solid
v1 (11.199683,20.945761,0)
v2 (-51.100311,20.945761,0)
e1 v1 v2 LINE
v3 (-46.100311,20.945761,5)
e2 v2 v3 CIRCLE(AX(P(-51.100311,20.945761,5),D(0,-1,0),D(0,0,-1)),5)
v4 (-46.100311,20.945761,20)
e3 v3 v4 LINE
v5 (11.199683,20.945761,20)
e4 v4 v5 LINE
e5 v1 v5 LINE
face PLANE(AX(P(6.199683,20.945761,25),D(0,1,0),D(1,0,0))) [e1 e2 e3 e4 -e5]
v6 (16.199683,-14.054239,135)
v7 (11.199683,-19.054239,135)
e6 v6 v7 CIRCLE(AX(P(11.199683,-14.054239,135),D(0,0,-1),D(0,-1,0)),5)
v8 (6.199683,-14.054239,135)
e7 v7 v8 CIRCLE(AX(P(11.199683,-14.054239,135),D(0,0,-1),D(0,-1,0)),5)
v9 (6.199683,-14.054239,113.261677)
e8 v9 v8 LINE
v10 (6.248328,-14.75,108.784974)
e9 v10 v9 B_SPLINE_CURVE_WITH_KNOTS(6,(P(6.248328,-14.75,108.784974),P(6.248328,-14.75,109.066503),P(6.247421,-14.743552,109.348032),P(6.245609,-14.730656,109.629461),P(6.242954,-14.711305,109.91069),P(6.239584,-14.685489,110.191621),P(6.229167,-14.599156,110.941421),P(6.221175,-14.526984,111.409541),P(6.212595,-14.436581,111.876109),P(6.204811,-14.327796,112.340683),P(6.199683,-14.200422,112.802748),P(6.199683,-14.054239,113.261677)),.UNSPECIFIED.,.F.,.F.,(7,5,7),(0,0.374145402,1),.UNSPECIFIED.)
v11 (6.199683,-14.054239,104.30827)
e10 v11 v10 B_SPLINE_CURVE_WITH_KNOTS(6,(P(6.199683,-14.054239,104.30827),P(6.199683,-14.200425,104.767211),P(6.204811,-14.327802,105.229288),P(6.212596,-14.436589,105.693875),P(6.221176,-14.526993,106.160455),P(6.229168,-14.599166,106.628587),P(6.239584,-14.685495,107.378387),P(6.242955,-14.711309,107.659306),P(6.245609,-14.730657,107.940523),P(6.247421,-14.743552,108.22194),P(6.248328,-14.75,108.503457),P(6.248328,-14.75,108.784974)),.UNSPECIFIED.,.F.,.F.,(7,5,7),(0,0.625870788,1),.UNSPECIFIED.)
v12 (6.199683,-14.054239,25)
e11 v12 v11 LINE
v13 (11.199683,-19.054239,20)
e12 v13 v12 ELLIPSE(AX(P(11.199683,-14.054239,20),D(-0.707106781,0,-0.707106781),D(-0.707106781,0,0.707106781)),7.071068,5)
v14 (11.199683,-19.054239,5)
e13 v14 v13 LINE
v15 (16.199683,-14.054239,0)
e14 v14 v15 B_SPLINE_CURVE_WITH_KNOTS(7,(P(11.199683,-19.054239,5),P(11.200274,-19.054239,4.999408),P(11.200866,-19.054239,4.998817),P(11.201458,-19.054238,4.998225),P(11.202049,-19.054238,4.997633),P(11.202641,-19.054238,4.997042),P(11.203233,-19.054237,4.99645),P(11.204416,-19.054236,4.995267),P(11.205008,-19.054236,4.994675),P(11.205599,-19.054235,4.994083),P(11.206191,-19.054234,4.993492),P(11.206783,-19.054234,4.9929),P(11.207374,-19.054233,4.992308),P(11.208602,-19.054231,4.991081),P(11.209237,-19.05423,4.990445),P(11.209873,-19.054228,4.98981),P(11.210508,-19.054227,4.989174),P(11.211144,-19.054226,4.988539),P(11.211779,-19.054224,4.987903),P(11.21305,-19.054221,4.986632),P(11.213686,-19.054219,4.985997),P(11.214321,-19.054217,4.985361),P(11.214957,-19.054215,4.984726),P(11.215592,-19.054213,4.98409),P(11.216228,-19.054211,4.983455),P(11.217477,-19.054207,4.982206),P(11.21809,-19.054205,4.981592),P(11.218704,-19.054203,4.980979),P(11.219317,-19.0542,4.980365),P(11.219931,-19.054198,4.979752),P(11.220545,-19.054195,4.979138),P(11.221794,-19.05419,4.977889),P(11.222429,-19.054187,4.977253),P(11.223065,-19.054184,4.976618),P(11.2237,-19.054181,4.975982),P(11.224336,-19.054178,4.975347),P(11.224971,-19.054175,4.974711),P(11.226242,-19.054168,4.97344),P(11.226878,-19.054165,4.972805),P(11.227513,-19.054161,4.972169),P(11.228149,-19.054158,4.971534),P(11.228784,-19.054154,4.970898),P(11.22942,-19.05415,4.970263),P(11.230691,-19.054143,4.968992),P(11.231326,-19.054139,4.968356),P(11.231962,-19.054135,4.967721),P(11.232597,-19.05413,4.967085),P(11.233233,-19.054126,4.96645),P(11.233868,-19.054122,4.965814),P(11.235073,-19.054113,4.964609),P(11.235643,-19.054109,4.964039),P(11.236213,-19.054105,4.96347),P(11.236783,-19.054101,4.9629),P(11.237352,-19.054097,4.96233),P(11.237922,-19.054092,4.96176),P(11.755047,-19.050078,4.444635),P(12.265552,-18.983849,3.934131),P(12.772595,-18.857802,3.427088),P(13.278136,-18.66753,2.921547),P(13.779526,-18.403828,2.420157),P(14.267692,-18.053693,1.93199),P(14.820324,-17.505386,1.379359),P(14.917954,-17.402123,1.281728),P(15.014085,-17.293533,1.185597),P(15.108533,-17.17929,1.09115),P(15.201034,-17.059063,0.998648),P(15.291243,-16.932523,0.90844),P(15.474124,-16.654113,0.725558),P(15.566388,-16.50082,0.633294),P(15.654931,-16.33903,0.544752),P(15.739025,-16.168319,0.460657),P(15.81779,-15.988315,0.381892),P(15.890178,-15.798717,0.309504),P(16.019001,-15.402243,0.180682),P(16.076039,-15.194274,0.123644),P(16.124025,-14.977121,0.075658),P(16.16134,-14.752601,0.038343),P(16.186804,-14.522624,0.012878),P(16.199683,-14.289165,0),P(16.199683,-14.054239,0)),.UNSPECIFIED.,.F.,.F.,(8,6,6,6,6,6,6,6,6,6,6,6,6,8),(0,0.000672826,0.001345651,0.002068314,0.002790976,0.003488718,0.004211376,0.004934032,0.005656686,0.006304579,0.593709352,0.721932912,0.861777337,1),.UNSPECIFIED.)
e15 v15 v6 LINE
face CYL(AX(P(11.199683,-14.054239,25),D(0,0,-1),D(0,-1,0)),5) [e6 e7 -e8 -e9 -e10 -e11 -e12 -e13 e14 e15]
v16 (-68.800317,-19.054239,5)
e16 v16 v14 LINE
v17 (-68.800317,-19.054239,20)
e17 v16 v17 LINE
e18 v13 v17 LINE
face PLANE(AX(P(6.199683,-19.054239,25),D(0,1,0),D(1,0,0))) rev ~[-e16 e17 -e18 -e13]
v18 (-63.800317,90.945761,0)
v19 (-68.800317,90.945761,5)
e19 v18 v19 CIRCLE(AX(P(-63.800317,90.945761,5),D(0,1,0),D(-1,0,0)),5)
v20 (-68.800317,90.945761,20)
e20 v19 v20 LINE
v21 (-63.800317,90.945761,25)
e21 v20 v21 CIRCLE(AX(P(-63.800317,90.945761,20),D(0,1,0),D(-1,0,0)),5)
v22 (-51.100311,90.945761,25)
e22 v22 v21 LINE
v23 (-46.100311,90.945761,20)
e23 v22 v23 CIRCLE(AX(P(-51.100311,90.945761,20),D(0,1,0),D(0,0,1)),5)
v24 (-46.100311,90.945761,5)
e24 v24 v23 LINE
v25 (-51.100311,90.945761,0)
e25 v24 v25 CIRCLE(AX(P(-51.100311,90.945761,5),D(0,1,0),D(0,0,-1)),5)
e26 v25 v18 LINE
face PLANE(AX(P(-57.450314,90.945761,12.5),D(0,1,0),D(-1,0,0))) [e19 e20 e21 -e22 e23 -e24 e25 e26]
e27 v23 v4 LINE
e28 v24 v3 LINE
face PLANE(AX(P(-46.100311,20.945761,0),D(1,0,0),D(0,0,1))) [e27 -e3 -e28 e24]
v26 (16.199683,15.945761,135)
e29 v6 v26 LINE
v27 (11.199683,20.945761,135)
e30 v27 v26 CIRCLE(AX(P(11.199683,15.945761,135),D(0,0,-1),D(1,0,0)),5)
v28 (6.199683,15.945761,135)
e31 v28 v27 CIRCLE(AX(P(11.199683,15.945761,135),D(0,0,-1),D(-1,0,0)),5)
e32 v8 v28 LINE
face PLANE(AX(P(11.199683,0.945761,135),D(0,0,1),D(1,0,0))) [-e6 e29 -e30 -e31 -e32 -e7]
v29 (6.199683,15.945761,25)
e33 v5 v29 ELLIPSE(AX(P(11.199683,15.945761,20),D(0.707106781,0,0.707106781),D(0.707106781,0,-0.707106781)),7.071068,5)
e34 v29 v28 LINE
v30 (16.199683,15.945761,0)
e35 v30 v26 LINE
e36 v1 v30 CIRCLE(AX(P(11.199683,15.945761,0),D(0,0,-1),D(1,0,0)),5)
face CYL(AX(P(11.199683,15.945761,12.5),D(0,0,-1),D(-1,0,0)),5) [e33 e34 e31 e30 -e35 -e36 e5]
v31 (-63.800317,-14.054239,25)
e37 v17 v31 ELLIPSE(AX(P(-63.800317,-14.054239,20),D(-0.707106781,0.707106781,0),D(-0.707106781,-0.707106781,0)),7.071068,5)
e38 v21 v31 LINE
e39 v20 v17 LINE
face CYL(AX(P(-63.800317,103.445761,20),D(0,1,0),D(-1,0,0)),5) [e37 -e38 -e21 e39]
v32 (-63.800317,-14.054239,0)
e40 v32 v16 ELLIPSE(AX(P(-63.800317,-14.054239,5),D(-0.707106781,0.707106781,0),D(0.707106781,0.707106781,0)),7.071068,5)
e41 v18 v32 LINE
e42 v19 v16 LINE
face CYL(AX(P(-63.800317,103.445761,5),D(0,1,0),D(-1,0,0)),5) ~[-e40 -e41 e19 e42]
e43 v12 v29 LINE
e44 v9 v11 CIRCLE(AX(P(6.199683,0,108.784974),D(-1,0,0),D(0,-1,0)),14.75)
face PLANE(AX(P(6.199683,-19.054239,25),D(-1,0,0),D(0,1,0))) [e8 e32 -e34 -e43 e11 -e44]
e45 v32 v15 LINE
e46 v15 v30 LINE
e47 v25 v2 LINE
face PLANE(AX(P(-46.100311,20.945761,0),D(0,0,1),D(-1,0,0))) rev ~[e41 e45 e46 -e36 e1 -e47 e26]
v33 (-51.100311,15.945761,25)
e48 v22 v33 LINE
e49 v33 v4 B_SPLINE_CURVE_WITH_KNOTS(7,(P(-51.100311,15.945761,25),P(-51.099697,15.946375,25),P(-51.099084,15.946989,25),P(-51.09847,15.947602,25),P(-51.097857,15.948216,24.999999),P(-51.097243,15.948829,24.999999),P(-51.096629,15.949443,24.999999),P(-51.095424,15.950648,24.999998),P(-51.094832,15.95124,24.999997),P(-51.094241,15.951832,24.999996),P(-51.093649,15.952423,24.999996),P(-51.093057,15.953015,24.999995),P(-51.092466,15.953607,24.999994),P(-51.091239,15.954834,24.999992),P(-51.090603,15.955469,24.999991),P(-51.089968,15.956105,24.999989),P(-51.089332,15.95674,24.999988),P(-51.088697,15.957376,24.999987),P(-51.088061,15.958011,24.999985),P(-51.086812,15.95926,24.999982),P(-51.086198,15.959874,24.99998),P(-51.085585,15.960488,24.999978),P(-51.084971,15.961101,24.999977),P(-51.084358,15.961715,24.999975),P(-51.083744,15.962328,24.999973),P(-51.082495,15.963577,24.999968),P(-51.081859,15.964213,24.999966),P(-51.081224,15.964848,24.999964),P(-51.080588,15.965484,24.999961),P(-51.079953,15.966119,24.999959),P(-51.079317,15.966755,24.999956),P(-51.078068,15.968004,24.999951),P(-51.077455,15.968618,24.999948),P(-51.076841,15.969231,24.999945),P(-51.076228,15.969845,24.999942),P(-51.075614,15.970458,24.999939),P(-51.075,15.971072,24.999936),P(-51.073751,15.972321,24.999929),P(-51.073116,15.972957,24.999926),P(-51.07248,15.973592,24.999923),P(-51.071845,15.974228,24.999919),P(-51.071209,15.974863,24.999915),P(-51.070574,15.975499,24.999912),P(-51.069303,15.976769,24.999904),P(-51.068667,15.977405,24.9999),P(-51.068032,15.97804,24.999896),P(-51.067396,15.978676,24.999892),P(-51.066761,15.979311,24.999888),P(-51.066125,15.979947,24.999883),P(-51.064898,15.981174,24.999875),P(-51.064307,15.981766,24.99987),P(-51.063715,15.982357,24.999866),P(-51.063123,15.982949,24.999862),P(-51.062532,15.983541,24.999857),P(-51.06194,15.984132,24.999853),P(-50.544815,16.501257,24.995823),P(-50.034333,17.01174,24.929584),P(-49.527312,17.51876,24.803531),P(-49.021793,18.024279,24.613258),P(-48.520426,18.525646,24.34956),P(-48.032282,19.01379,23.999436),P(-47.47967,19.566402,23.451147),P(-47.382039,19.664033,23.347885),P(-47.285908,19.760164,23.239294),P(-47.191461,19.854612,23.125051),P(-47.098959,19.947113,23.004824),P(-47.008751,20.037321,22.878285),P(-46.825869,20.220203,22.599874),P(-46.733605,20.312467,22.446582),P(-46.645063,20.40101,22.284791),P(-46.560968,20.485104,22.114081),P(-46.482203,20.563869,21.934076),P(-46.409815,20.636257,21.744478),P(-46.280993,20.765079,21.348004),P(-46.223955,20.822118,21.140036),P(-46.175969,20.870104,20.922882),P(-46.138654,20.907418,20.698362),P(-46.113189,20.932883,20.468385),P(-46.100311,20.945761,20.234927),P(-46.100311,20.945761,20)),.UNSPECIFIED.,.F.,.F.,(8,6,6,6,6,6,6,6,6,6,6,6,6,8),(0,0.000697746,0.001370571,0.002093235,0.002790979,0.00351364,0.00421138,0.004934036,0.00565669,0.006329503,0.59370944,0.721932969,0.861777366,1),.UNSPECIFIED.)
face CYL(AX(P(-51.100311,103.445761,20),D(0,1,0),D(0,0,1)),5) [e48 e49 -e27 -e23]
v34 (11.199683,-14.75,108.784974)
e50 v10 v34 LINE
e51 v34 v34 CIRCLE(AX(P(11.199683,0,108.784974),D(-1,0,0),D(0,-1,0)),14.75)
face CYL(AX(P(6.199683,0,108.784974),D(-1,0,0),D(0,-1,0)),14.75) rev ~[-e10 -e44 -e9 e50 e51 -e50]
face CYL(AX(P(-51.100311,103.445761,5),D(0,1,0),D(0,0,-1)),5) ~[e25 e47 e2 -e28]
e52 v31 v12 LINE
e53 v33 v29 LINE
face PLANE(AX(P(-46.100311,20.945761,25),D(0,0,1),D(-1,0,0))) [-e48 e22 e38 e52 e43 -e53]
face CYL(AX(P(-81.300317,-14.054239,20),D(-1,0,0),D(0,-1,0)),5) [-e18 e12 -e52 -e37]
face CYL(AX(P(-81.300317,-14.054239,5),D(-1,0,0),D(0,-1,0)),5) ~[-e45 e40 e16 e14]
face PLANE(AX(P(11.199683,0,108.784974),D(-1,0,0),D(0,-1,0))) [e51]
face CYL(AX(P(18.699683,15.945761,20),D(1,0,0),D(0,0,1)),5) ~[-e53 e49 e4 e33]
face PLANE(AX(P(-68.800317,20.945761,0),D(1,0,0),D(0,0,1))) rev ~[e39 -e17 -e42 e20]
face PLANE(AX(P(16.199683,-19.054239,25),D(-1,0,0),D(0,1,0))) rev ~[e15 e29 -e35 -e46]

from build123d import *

# Parameters (mm, degrees)
F0_W         = 70
F0_H         = 40
F0_W_2       = 15
F1_DEPTH     = 25
F2_W         = 10
F2_H         = 40
F3_DEPTH     = 110
F4_W         = 22.7000065148
F4_H         = 25
F5_DEPTH     = 70
F6_R         = 14.75
F7_DEPTH     = 5
F8_T1_DEPTH  = 87.5
F8_T3_DEPTH  = 52.2999934852
F8_T5_DEPTH  = 82.5
F8_T7_DEPTH  = 135
F8_T9_DEPTH  = 110
F8_T11_DEPTH = 160
F8_T13_DEPTH = 122.5
F8_T19_DEPTH = 100
F8_T23_DEPTH = 135
F8_T30_DEPTH = 64.7999934852
F8_T34_DEPTH = 135
F8_T41_DEPTH = 64.7999934852
F8_T45_DEPTH = 95


# Not quite as in the source:
# - a fillet or chamfer that OpenCascade refuses, or shapes differently, is made with other operations: its cross-section is extruded or revolved along the edge and cut away or added


with BuildPart() as f1:
    # F0 (on Top) → F1 (new body)
    with BuildSketch(Plane.XY):
        with Locations((-33.8003174961, 0.9457613719)):
            Rectangle(F0_W, F0_H)
        with Locations((8.6996825039, 0.9457613719)):
            Rectangle(F0_W_2, F0_H)
    extrude(amount=F1_DEPTH)

    # F2 (on face) → F3 (join)
    with BuildSketch(Plane.XY.offset(25)):
        with Locations((11.1996825039, 0.9457613719)):
            Rectangle(F2_W, F2_H)
    extrude(amount=F3_DEPTH)

    # F4 (on face) → F5 (join)
    with BuildSketch(Plane(origin=(0, 20.9457613719, 0), x_dir=(-1, 0, 0), z_dir=(0, 1, 0))):
        with Locations((57.4503142387, 12.5)):
            Rectangle(F4_W, F4_H)
    extrude(amount=F5_DEPTH)

    # F6 (on face) → F7 (cut)
    with BuildSketch(Plane(origin=(6.1996825039, 0, 0), x_dir=(0, -1, 0), z_dir=(-1, 0, 0))):
        with Locations((0, 108.7849736214)):
            Circle(F6_R)
    extrude(amount=-F7_DEPTH, mode=Mode.SUBTRACT)

    # F8: fillet of radius 5 on 11 edges, made by hand

    # F8_s2 → F8_t1 (cut)
    with BuildSketch(Plane.YZ.offset(-81.3003174961)):
        with BuildLine():
            ThreePointArc((-19.0542386281, 20), (-17.589772534, 23.5355339059), (-14.0542386281, 25))
            Line((-14.0542386281, 25), (-19.0542386281, 25))
            Line((-19.0542386281, 25), (-19.0542386281, 20))
        make_face()
    extrude(amount=F8_T1_DEPTH, mode=Mode.SUBTRACT)

    # F8_s4 → F8_t3 (cut)
    with BuildSketch(Plane.YZ.offset(-46.1003109813)):
        with BuildLine():
            ThreePointArc((15.9457613719, 25), (19.4812952778, 23.5355339059), (20.9457613719, 20))
            Line((20.9457613719, 20), (20.9457613719, 25))
            Line((20.9457613719, 25), (15.9457613719, 25))
        make_face()
    extrude(amount=F8_T3_DEPTH, mode=Mode.SUBTRACT)

    # F8_s6 → F8_t5 (cut)
    with BuildSketch(Plane.XZ.offset(-103.4457613719)):
        with BuildLine():
            ThreePointArc((-51.1003109813, 25), (-47.5647770753, 23.5355339059), (-46.1003109813, 20))
            Line((-46.1003109813, 20), (-46.1003109813, 25))
            Line((-46.1003109813, 25), (-51.1003109813, 25))
        make_face()
        with BuildLine():
            ThreePointArc((-51.1003109813, 0), (-47.5647770753, 1.4644660941), (-46.1003109813, 5))
            Line((-46.1003109813, 5), (-46.1003109813, 0))
            Line((-46.1003109813, 0), (-51.1003109813, 0))
        make_face()
    extrude(amount=F8_T5_DEPTH, mode=Mode.SUBTRACT)

    # F8_s8 → F8_t7 (cut)
    with BuildSketch(Plane.XZ.offset(-103.4457613719)):
        with BuildLine():
            ThreePointArc((-68.8003174961, 20), (-67.335851402, 23.5355339059), (-63.8003174961, 25))
            Line((-63.8003174961, 25), (-68.8003174961, 25))
            Line((-68.8003174961, 25), (-68.8003174961, 20))
        make_face()
        with BuildLine():
            ThreePointArc((-68.8003174961, 5), (-67.335851402, 1.4644660941), (-63.8003174961, 0))
            Line((-63.8003174961, 0), (-68.8003174961, 0))
            Line((-68.8003174961, 0), (-68.8003174961, 5))
        make_face()
    extrude(amount=F8_T7_DEPTH, mode=Mode.SUBTRACT)

    # F8_s10 → F8_t9 (cut)
    with BuildSketch(Plane.YZ.offset(-81.3003174961)):
        with BuildLine():
            ThreePointArc((-19.0542386281, 5), (-17.589772534, 1.4644660941), (-14.0542386281, 0))
            Line((-14.0542386281, 0), (-19.0542386281, 0))
            Line((-19.0542386281, 0), (-19.0542386281, 5))
        make_face()
    extrude(amount=F8_T9_DEPTH, mode=Mode.SUBTRACT)

    # F8_s12 → F8_t11 (cut)
    with BuildSketch(Plane.XY.offset(-12.5)):
        with BuildLine():
            ThreePointArc((11.1996825039, -19.0542386281), (14.7352164099, -17.589772534), (16.1996825039, -14.0542386281))
            Line((16.1996825039, -14.0542386281), (16.1996825039, -19.0542386281))
            Line((16.1996825039, -19.0542386281), (11.1996825039, -19.0542386281))
        make_face()
        with BuildLine():
            ThreePointArc((16.1996825039, 15.9457613719), (14.7352164099, 19.4812952778), (11.1996825039, 20.9457613719))
            Line((11.1996825039, 20.9457613719), (16.1996825039, 20.9457613719))
            Line((16.1996825039, 20.9457613719), (16.1996825039, 15.9457613719))
        make_face()
    extrude(amount=F8_T11_DEPTH, mode=Mode.SUBTRACT)

    # F8_s14 → F8_t13 (cut)
    with BuildSketch(Plane.XY.offset(25)):
        with BuildLine():
            ThreePointArc((11.1996825039, -19.0542386281), (7.664148598, -17.589772534), (6.1996825039, -14.0542386281))
            Line((6.1996825039, -14.0542386281), (6.1996825039, -19.0542386281))
            Line((6.1996825039, -19.0542386281), (11.1996825039, -19.0542386281))
        make_face()
        with BuildLine():
            ThreePointArc((6.1996825039, 15.9457613719), (7.664148598, 19.4812952778), (11.1996825039, 20.9457613719))
            Line((11.1996825039, 20.9457613719), (6.1996825039, 20.9457613719))
            Line((6.1996825039, 20.9457613719), (6.1996825039, 15.9457613719))
        make_face()
    extrude(amount=F8_T13_DEPTH, mode=Mode.SUBTRACT)


with BuildPart() as f8_tool17:
    # F8_s18 → F8_t19 (new body)
    with BuildSketch(Plane.YZ.offset(-81.3003174961)):
        with BuildLine():
            ThreePointArc((-19.0542386281, 20), (-17.589772534, 23.5355339059), (-14.0542386281, 25))
            Line((-14.0542386281, 25), (-19.0542386281, 25))
            Line((-19.0542386281, 25), (-19.0542386281, 20))
        make_face()
    extrude(amount=F8_T19_DEPTH)

    split(bisect_by=Plane.YZ.offset(6.1996825039), keep=Keep.TOP)


with BuildPart() as f8_tool21:
    # F8_s22 → F8_t23 (new body)
    with BuildSketch(Plane.XY.offset(12.5)):
        with BuildLine():
            ThreePointArc((11.1996825039, -19.0542386281), (7.664148598, -17.589772534), (6.1996825039, -14.0542386281))
            Line((6.1996825039, -14.0542386281), (6.1996825039, -19.0542386281))
            Line((6.1996825039, -19.0542386281), (11.1996825039, -19.0542386281))
        make_face()
    extrude(amount=F8_T23_DEPTH)

    split(bisect_by=Plane.XY.offset(25), keep=Keep.BOTTOM)


with BuildPart() as f8_tool17_1:
    add(f8_tool17.part)

    # F8_t25: intersect F8_tool21
    add(f8_tool21.part, mode=Mode.INTERSECT)


with BuildPart() as f1_1:
    add(f1.part)

    # F8_t15: cut F8_tool17
    add(f8_tool17_1.part, mode=Mode.SUBTRACT)


with BuildPart() as f8_tool28:
    # F8_s29 → F8_t30 (new body)
    with BuildSketch(Plane.YZ.offset(18.6996825039)):
        with BuildLine():
            ThreePointArc((15.9457613719, 25), (19.4812952778, 23.5355339059), (20.9457613719, 20))
            Line((20.9457613719, 20), (20.9457613719, 25))
            Line((20.9457613719, 25), (15.9457613719, 25))
        make_face()
    extrude(amount=-F8_T30_DEPTH)

    split(bisect_by=Plane.YZ.offset(6.1996825039), keep=Keep.TOP)


with BuildPart() as f8_tool32:
    # F8_s33 → F8_t34 (new body)
    with BuildSketch(Plane.XY.offset(12.5)):
        with BuildLine():
            ThreePointArc((6.1996825039, 15.9457613719), (7.664148598, 19.4812952778), (11.1996825039, 20.9457613719))
            Line((11.1996825039, 20.9457613719), (6.1996825039, 20.9457613719))
            Line((6.1996825039, 20.9457613719), (6.1996825039, 15.9457613719))
        make_face()
    extrude(amount=F8_T34_DEPTH)

    split(bisect_by=Plane.XY.offset(25), keep=Keep.BOTTOM)


with BuildPart() as f8_tool28_1:
    add(f8_tool28.part)

    # F8_t36: intersect F8_tool32
    add(f8_tool32.part, mode=Mode.INTERSECT)


with BuildPart() as f1_2:
    add(f1_1.part)

    # F8_t26: cut F8_tool28
    add(f8_tool28_1.part, mode=Mode.SUBTRACT)


with BuildPart() as f8_tool39:
    # F8_s40 → F8_t41 (new body)
    with BuildSketch(Plane.YZ.offset(6.1996825039)):
        with BuildLine():
            ThreePointArc((15.9457613719, 25), (19.4812952778, 23.5355339059), (20.9457613719, 20))
            Line((20.9457613719, 20), (20.9457613719, 25))
            Line((20.9457613719, 25), (15.9457613719, 25))
        make_face()
    extrude(amount=-F8_T41_DEPTH)

    split(bisect_by=Plane.YZ.offset(-46.1003109813), keep=Keep.BOTTOM)


with BuildPart() as f8_tool43:
    # F8_s44 → F8_t45 (new body)
    with BuildSketch(Plane.XZ.offset(-8.4457613719)):
        with BuildLine():
            ThreePointArc((-51.1003109813, 25), (-47.5647770753, 23.5355339059), (-46.1003109813, 20))
            Line((-46.1003109813, 20), (-46.1003109813, 25))
            Line((-46.1003109813, 25), (-51.1003109813, 25))
        make_face()
    extrude(amount=-F8_T45_DEPTH)

    split(bisect_by=Plane.XZ.offset(-20.9457613719), keep=Keep.TOP)


with BuildPart() as f8_tool39_1:
    add(f8_tool39.part)

    # F8_t47: intersect F8_tool43
    add(f8_tool43.part, mode=Mode.INTERSECT)


with BuildPart() as f1_3:
    add(f1_2.part)

    # F8_t37: cut F8_tool39
    add(f8_tool39_1.part, mode=Mode.SUBTRACT)


solid = f1_3.part
